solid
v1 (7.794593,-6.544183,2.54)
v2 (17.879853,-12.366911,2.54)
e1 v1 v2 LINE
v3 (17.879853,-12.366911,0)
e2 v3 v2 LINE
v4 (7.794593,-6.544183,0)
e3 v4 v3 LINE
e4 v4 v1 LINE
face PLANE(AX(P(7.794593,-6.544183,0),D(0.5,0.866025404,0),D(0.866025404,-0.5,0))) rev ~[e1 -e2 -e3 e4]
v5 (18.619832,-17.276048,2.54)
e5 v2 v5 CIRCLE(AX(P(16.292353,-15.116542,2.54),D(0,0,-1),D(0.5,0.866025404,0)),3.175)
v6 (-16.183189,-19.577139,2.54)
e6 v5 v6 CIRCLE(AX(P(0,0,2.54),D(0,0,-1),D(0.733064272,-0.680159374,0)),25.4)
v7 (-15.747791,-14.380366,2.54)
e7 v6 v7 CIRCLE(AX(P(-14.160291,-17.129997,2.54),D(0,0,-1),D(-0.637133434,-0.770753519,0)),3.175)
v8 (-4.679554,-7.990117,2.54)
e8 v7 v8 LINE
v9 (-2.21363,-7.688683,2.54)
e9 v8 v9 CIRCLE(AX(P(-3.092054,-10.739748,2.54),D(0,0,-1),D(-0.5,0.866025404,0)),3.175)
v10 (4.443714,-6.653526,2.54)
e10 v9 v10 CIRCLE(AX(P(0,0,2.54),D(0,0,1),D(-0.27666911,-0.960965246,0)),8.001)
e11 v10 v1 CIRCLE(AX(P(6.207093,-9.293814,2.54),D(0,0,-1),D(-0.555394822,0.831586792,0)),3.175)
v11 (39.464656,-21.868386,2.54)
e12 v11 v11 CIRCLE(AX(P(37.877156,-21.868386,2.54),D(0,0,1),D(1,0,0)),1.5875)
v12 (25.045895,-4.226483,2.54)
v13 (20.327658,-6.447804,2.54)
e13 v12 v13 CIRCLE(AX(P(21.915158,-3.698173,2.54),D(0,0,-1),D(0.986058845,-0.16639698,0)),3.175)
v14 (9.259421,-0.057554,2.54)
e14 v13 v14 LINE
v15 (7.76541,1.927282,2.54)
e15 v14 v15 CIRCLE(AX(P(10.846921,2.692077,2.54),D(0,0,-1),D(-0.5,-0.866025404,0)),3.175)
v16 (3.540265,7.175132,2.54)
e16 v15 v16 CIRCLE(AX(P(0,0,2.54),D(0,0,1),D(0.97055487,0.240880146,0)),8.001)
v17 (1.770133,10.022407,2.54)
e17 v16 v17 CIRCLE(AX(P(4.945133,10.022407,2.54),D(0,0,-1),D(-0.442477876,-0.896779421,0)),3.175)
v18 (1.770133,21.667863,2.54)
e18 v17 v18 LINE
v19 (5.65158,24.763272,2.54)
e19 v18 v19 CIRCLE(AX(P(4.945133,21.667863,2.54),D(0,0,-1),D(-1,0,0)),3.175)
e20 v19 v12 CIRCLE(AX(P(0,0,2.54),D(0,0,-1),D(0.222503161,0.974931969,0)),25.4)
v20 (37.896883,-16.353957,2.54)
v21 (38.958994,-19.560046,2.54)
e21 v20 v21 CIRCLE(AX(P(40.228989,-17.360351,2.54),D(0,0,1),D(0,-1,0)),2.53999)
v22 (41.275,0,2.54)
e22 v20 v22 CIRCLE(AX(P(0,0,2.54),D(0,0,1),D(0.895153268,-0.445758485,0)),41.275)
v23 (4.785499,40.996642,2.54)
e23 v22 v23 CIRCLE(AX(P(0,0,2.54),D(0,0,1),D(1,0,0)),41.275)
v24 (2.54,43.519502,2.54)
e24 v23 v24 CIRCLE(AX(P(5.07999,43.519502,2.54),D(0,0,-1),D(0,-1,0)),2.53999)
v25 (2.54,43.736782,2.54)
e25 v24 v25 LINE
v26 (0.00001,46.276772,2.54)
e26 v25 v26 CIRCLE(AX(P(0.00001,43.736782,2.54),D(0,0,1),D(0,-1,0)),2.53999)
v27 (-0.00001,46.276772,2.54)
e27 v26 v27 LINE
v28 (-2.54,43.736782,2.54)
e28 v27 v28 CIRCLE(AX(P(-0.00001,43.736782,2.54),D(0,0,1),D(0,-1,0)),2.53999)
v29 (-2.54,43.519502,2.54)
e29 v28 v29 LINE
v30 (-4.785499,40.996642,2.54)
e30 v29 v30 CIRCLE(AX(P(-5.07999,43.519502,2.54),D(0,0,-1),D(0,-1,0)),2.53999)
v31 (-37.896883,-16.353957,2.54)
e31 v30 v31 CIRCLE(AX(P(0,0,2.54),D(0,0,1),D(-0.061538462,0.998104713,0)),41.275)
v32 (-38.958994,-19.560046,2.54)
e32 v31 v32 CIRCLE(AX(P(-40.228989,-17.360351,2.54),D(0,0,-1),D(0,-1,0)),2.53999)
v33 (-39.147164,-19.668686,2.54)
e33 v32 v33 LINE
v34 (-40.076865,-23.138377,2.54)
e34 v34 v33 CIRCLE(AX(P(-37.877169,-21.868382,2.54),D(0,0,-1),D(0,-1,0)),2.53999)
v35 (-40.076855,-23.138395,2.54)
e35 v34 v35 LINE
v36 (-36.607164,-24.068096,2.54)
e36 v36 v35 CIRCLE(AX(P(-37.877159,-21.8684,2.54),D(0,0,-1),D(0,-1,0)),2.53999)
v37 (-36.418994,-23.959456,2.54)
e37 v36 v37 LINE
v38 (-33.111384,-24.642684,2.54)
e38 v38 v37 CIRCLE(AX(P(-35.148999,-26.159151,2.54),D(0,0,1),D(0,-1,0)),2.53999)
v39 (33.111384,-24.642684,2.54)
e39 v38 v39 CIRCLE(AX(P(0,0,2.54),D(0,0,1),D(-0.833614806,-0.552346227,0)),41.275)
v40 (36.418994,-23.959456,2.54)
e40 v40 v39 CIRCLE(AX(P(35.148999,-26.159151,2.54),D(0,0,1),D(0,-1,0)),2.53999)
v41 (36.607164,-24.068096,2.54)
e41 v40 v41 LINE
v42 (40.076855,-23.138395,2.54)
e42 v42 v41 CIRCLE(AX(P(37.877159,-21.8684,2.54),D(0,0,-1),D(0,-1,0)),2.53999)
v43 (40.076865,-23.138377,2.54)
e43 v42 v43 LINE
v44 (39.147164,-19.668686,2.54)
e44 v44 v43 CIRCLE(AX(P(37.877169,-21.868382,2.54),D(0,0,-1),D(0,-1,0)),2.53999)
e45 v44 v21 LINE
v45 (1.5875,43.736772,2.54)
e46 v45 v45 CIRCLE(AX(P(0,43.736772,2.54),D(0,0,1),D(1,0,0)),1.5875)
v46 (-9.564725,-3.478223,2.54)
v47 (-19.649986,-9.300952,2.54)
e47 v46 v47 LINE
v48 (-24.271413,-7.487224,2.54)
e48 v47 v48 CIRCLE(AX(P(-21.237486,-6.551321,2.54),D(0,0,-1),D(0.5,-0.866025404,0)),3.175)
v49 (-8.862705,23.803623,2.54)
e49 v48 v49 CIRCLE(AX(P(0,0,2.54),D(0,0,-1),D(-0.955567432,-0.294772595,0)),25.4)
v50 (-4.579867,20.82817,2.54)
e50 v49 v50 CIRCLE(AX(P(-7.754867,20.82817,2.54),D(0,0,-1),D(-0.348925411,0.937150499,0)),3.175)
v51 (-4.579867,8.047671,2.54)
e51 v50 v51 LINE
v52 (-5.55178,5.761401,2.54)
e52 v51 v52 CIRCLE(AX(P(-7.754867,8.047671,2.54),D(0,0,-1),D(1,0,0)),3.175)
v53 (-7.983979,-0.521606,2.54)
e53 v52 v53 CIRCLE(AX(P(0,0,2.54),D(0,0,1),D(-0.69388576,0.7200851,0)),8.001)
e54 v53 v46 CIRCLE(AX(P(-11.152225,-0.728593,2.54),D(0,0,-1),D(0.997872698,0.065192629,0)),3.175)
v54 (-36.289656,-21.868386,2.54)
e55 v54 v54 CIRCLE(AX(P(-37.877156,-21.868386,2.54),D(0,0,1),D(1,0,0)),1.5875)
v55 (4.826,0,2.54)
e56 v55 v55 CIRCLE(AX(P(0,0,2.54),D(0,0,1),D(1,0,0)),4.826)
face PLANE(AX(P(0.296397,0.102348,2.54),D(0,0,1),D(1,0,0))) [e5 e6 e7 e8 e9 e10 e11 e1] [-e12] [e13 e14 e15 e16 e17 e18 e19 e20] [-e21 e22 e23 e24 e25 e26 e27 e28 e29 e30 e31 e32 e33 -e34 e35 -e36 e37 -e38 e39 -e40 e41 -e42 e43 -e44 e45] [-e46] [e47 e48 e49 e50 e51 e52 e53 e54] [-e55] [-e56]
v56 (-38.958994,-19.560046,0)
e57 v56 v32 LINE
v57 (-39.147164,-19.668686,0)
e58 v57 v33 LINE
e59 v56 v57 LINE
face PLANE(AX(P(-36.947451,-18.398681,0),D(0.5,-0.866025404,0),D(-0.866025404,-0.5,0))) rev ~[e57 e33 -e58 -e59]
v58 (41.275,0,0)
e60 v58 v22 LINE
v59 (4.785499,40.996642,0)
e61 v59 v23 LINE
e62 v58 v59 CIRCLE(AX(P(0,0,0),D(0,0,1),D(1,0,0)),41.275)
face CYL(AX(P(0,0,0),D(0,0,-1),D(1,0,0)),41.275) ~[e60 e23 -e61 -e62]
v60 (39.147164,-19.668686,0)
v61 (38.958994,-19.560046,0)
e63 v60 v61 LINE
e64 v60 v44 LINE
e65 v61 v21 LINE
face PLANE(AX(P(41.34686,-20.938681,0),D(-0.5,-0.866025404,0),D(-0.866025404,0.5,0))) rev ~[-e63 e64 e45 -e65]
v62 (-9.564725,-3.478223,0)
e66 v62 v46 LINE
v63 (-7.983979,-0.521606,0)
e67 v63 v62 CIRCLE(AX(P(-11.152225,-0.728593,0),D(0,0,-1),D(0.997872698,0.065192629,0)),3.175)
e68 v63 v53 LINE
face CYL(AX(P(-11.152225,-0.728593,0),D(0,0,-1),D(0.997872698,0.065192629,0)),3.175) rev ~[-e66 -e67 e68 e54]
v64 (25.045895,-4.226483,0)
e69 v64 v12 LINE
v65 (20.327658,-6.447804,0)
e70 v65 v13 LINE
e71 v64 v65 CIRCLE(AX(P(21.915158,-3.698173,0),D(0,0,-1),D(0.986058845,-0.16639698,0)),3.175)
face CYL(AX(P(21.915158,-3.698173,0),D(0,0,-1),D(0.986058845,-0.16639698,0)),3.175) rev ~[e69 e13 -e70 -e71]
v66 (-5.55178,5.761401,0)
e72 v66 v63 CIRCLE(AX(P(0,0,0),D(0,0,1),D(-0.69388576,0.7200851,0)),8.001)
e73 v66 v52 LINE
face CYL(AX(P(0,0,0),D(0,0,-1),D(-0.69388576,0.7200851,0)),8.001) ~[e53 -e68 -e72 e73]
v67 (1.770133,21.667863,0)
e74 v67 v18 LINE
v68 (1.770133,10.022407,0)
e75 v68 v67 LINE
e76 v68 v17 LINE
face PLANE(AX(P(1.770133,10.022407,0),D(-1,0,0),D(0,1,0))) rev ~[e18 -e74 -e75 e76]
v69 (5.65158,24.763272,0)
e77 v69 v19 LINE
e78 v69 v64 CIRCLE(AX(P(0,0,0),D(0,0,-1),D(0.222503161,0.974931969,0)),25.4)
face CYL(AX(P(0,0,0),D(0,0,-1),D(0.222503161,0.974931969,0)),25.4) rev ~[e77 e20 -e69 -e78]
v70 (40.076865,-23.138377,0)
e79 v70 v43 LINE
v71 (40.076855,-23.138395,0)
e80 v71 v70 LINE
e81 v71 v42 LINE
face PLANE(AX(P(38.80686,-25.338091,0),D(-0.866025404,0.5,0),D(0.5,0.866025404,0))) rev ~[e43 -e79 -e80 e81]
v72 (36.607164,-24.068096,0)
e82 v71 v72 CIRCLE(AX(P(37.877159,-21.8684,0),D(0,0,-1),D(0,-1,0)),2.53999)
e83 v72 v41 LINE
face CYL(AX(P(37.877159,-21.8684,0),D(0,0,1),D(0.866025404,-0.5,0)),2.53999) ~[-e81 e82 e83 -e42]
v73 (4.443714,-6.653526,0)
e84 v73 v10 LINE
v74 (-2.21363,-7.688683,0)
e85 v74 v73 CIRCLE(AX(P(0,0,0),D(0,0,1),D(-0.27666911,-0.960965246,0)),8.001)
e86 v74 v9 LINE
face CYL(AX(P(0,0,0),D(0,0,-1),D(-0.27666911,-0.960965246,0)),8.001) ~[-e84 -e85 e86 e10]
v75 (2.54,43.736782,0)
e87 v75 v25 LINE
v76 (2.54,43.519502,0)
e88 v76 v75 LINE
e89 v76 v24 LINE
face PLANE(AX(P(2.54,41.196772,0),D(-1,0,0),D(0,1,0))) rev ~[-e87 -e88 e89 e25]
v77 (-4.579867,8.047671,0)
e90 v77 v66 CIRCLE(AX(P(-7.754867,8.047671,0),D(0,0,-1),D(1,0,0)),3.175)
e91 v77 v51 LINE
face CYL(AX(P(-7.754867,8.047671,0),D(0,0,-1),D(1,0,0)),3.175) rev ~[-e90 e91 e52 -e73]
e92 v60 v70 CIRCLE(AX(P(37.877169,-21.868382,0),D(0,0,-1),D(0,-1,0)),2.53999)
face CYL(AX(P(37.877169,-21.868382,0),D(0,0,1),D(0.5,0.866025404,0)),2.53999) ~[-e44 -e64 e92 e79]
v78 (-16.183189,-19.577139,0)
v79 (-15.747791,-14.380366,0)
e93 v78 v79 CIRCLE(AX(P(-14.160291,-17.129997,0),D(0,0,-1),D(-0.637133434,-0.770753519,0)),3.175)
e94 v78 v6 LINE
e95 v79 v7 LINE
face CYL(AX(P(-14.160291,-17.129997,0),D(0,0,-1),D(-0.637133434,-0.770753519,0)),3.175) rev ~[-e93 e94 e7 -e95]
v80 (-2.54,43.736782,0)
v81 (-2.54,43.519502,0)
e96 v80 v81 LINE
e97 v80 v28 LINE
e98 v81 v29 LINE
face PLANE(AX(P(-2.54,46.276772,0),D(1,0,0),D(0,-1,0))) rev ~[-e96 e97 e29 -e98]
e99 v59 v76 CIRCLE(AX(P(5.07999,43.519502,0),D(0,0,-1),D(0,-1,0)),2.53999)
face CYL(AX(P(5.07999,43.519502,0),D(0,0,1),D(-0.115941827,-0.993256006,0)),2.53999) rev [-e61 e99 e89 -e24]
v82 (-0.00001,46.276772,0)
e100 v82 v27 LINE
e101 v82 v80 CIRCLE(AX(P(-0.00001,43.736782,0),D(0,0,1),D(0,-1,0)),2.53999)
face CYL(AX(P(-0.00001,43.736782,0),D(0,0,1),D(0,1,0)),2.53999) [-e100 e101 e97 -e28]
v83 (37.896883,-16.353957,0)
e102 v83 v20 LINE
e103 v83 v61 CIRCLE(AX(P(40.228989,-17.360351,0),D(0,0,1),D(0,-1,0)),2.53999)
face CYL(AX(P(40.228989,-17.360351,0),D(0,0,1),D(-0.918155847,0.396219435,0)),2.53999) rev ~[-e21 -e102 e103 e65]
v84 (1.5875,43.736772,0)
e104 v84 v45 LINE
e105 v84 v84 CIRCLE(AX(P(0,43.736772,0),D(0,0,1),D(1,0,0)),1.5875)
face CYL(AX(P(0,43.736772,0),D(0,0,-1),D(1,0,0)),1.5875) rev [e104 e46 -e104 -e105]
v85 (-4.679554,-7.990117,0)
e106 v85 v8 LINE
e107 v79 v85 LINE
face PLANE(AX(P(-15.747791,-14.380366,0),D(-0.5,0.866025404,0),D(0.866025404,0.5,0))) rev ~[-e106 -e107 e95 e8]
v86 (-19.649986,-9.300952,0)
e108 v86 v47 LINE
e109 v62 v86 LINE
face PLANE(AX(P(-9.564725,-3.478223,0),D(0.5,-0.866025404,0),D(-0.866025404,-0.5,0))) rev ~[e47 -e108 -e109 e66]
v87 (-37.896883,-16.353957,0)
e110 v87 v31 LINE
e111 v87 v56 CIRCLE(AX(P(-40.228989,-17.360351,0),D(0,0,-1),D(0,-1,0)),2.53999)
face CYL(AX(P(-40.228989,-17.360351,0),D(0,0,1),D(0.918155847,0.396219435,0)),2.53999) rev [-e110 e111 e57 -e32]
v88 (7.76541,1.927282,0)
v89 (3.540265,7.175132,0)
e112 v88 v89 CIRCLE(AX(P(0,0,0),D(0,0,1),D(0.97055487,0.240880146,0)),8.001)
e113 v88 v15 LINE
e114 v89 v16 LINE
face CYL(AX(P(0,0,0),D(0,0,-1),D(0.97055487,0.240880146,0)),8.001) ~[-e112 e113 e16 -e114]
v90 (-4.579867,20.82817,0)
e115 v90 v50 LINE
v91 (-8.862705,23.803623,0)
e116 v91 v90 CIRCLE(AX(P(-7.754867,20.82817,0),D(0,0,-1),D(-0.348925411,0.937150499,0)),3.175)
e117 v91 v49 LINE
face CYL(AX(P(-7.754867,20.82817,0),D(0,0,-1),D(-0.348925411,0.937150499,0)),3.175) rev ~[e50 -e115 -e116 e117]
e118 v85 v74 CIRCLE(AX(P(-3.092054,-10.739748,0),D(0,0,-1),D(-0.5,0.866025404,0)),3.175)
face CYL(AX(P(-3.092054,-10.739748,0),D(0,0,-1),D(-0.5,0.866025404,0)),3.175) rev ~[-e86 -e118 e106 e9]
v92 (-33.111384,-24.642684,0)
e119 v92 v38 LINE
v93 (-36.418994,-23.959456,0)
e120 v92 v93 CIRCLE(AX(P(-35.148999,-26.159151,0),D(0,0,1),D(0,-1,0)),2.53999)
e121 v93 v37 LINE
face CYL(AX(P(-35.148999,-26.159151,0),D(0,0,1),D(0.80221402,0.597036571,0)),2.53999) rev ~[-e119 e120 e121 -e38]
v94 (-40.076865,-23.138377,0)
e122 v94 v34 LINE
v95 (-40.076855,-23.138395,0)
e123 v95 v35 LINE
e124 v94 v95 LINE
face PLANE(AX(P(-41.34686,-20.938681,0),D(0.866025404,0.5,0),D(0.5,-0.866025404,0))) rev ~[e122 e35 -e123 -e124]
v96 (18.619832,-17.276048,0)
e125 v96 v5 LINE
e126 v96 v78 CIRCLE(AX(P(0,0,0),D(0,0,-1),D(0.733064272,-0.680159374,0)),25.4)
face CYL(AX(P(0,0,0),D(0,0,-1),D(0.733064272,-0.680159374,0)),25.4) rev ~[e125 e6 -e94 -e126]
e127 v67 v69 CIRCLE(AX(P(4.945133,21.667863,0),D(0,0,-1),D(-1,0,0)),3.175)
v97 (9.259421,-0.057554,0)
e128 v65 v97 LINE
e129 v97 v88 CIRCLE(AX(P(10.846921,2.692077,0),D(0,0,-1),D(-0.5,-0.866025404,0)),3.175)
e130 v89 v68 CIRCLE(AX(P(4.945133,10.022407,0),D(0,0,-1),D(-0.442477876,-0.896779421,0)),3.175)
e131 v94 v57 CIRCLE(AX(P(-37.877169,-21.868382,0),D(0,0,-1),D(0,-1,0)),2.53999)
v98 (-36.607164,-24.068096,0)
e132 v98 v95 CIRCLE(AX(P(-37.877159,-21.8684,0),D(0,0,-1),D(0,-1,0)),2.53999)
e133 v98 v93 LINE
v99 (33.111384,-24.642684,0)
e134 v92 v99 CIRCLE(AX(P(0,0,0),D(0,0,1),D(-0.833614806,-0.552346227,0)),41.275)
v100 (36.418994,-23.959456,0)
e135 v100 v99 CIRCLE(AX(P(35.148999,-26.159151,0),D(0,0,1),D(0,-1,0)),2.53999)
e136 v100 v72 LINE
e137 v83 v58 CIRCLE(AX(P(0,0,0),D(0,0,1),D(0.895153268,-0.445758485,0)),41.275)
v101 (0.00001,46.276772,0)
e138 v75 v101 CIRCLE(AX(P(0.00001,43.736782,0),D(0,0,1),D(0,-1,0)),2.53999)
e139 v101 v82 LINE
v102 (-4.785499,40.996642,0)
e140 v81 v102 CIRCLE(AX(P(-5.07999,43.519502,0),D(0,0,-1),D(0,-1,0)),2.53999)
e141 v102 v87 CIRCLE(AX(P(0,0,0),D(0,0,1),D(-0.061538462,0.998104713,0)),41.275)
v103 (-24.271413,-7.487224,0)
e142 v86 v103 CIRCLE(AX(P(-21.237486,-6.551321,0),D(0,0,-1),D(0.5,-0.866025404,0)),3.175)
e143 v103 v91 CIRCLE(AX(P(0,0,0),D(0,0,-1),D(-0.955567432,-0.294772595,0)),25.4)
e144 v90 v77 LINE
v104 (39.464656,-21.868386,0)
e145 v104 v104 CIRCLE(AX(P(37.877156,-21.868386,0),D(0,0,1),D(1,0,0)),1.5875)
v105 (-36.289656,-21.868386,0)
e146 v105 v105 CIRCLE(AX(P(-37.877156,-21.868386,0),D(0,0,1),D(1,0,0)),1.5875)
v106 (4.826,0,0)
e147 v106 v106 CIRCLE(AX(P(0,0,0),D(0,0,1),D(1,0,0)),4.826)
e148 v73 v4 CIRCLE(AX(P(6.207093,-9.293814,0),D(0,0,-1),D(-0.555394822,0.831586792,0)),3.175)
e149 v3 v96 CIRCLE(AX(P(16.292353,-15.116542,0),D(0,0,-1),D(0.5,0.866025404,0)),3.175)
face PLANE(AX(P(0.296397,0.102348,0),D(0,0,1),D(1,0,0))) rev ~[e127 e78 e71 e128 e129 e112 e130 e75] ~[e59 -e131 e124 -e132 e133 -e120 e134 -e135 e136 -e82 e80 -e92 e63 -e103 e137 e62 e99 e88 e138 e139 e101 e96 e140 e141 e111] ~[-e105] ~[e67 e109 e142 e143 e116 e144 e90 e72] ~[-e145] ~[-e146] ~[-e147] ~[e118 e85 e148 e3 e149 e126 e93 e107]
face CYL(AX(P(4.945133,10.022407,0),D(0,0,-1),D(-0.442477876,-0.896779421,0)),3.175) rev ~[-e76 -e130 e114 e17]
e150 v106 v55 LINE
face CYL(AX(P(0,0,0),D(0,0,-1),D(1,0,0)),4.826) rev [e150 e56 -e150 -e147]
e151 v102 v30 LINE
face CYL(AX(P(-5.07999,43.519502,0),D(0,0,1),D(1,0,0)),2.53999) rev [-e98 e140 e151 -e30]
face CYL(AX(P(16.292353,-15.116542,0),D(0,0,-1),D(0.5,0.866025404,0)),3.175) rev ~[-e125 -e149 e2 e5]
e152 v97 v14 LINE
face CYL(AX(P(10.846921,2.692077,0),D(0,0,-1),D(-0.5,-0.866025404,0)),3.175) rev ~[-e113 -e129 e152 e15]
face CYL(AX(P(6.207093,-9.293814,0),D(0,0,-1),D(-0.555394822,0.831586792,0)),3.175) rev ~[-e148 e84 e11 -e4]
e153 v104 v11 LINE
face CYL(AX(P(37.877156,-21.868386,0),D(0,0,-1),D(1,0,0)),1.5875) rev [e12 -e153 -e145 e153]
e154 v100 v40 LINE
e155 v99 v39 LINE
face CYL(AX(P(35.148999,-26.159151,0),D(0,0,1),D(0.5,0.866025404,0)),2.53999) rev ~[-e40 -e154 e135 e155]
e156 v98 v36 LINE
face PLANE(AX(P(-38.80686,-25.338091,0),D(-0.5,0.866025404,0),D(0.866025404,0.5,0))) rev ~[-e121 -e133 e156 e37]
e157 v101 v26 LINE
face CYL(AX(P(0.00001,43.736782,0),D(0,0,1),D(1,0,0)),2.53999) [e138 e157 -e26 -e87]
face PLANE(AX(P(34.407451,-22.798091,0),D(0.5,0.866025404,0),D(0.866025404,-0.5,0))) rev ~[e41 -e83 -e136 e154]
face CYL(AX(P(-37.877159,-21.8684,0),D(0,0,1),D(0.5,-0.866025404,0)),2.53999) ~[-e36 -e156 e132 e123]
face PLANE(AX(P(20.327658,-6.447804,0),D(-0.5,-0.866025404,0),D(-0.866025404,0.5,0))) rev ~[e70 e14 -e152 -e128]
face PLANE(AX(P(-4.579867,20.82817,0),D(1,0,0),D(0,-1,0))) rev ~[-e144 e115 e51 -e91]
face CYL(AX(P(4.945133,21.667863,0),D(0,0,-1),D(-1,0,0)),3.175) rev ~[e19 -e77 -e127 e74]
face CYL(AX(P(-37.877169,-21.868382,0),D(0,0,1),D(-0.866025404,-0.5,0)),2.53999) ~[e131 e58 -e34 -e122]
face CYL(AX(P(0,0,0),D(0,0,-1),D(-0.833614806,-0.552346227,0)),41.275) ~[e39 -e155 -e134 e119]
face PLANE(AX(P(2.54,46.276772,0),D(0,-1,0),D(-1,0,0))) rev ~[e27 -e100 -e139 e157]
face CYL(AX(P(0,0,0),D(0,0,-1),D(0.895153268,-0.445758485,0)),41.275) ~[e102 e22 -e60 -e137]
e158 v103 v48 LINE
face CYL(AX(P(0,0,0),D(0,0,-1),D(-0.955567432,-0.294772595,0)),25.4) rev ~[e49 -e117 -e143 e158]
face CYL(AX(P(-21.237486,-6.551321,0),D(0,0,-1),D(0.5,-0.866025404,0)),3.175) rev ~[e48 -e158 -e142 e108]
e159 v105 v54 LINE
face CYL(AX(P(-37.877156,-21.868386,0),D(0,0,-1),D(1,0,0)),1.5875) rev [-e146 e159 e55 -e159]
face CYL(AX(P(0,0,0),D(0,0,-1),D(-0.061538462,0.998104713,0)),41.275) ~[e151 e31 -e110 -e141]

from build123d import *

# Parameters (mm, degrees)
F0_R     = 4.826
F0_R_2   = 1.5875
F1_DEPTH = 2.54
F2_R     = 2.53999


# Not quite as in the source:
# - a fillet or chamfer is up to 0.001 mm smaller than in the source, because OpenCascade refuses the exact size


with BuildPart() as f1:
    # F0 (on Top) → F1 (new body)
    with BuildSketch(Plane.XY):
        with BuildLine():
            ThreePointArc((36.9474511246, -18.3986814852), (40.1785494398, -9.4503857019), (41.275, 0))
            ThreePointArc((41.275, 0), (30.0704516511, 28.2735488133), (2.54, 41.1967720216))
            ThreePointArc((2.54, 41.1967720216), (0, 41.275), (-2.54, 41.1967720216))
            ThreePointArc((-2.54, 41.1967720216), (-35.7451985412, 20.6375), (-36.9474511246, -18.3986814852))
            ThreePointArc((-36.9474511246, -18.3986814852), (-35.7451985412, -20.6375), (-34.4074511246, -22.7980905364))
            ThreePointArc((-34.4074511246, -22.7980905364), (0, -41.275), (34.4074511246, -22.7980905364))
            ThreePointArc((34.4074511246, -22.7980905364), (35.7451985412, -20.6375), (36.9474511246, -18.3986814852))
        make_face()
        with BuildLine():
            ThreePointArc((-16.1831892187, -19.5771393904), (-17.3242054231, -16.864916263), (-15.7477905664, -14.3803663096))
            Line((-15.7477905664, -14.3803663096), (-4.6795539693, -7.9901169308))
            ThreePointArc((-4.6795539693, -7.9901169308), (-3.4772976031, -7.5882063232), (-2.2136295462, -7.6886829322))
            ThreePointArc((-2.2136295462, -7.6886829322), (1.2293114508, -7.9059973664), (4.4437139688, -6.6535259196))
            ThreePointArc((4.4437139688, -6.6535259196), (6.1035441451, -6.1205029783), (7.7945925279, -6.544183326))
            Line((7.7945925279, -6.544183326), (17.8798534353, -12.3669114257))
            ThreePointArc((17.8798534353, -12.3669114257), (19.431886995, -14.6433042701), (18.6198324975, -17.2760480945))
            ThreePointArc((18.6198324975, -17.2760480945), (1.6757275748, -25.3446628917), (-16.1831892187, -19.5771393904))
        make_face(mode=Mode.SUBTRACT)
        Circle(F0_R, mode=Mode.SUBTRACT)
        with BuildLine():
            ThreePointArc((-24.2714127756, -7.4872239098), (-22.786985702, 11.2211087963), (-8.8627054362, 23.8036226729))
            ThreePointArc((-8.8627054362, 23.8036226729), (-5.9433432049, 23.4356601283), (-4.5798672566, 20.8281698388))
            Line((-4.5798672566, 20.8281698388), (-4.5798672566, 8.0476710812))
            ThreePointArc((-4.5798672566, 8.0476710812), (-4.8329306435, 6.8055312224), (-5.5517799678, 5.7614008877))
            ThreePointArc((-5.5517799678, 5.7614008877), (-7.4614502869, 2.8883837376), (-7.9839794556, -0.5216062243))
            ThreePointArc((-7.9839794556, -0.5216062243), (-8.3522831357, -2.2255727936), (-9.5647252713, -3.4782234783))
            Line((-9.5647252713, -3.4782234783), (-19.6499861787, -9.3009515781))
            ThreePointArc((-19.6499861787, -9.3009515781), (-22.3974169907, -9.5068556461), (-24.2714127756, -7.4872239098))
        make_face(mode=Mode.SUBTRACT)
        with BuildLine():
            Line((1.7701327434, 10.0224068043), (1.7701327434, 21.6678630038))
            ThreePointArc((1.7701327434, 21.6678630038), (2.9655299957, 24.1501599162), (5.6515802781, 24.7632720043))
            ThreePointArc((5.6515802781, 24.7632720043), (21.1112581272, 14.1235540955), (25.0458946549, -4.2264832825))
            ThreePointArc((25.0458946549, -4.2264832825), (23.267548628, -6.5707438653), (20.327657823, -6.4478035292))
            Line((20.327657823, -6.4478035292), (9.259421226, -0.0575541504))
            ThreePointArc((9.259421226, -0.0575541504), (8.3102282466, 0.7826751008), (7.7654095141, 1.9272820445))
            ThreePointArc((7.7654095141, 1.9272820445), (6.2321388361, 5.0176136288), (3.5402654867, 7.175132144))
            ThreePointArc((3.5402654867, 7.175132144), (2.2487389906, 8.3460757719), (1.7701327434, 10.0224068043))
        make_face(mode=Mode.SUBTRACT)
        with BuildLine():
            ThreePointArc((-2.54, 41.1967720216), (0, 41.275), (2.54, 41.1967720216))
            Line((2.54, 41.1967720216), (2.54, 46.2767720216))
            Line((2.54, 46.2767720216), (-2.54, 46.2767720216))
            Line((-2.54, 46.2767720216), (-2.54, 41.1967720216))
        make_face()
        with Locations((0, 43.7367720216)):
            Circle(F0_R_2, mode=Mode.SUBTRACT)
        with BuildLine():
            ThreePointArc((-34.4074511246, -22.7980905364), (-35.7451985412, -20.6375), (-36.9474511246, -18.3986814852))
            Line((-36.9474511246, -18.3986814852), (-41.3468601758, -20.9386814852))
            Line((-41.3468601758, -20.9386814852), (-38.8068601758, -25.3380905364))
            Line((-38.8068601758, -25.3380905364), (-34.4074511246, -22.7980905364))
        make_face()
        with Locations((-37.8771556502, -21.8683860108)):
            Circle(F0_R_2, mode=Mode.SUBTRACT)
        with BuildLine():
            Line((41.3468601758, -20.9386814852), (36.9474511246, -18.3986814852))
            ThreePointArc((36.9474511246, -18.3986814852), (35.7451985412, -20.6375), (34.4074511246, -22.7980905364))
            Line((34.4074511246, -22.7980905364), (38.8068601758, -25.3380905364))
            Line((38.8068601758, -25.3380905364), (41.3468601758, -20.9386814852))
        make_face()
        with Locations((37.8771556502, -21.8683860108)):
            Circle(F0_R_2, mode=Mode.SUBTRACT)
    extrude(amount=F1_DEPTH)

    # F2 (radius 2.54 in the source; OpenCascade refuses exactly that, so slightly less here)
    f2_edges = [f1.edges().sort_by_distance(p)[0] for p in [
        (-34.407451, -22.798091, 1.27),
        (-38.80686, -25.338091, 1.27),
        (-41.34686, -20.938681, 1.27),
        (-36.947451, -18.398681, 1.27),
        (34.407451, -22.798091, 1.27),
        (38.80686, -25.338091, 1.27),
        (41.34686, -20.938681, 1.27),
        (36.947451, -18.398681, 1.27),
        (2.54, 41.196772, 1.27),
        (2.54, 46.276772, 1.27),
        (-2.54, 41.196772, 1.27),
        (-2.54, 46.276772, 1.27),
    ]]
    fillet(f2_edges, radius=F2_R)


solid = f1.part
